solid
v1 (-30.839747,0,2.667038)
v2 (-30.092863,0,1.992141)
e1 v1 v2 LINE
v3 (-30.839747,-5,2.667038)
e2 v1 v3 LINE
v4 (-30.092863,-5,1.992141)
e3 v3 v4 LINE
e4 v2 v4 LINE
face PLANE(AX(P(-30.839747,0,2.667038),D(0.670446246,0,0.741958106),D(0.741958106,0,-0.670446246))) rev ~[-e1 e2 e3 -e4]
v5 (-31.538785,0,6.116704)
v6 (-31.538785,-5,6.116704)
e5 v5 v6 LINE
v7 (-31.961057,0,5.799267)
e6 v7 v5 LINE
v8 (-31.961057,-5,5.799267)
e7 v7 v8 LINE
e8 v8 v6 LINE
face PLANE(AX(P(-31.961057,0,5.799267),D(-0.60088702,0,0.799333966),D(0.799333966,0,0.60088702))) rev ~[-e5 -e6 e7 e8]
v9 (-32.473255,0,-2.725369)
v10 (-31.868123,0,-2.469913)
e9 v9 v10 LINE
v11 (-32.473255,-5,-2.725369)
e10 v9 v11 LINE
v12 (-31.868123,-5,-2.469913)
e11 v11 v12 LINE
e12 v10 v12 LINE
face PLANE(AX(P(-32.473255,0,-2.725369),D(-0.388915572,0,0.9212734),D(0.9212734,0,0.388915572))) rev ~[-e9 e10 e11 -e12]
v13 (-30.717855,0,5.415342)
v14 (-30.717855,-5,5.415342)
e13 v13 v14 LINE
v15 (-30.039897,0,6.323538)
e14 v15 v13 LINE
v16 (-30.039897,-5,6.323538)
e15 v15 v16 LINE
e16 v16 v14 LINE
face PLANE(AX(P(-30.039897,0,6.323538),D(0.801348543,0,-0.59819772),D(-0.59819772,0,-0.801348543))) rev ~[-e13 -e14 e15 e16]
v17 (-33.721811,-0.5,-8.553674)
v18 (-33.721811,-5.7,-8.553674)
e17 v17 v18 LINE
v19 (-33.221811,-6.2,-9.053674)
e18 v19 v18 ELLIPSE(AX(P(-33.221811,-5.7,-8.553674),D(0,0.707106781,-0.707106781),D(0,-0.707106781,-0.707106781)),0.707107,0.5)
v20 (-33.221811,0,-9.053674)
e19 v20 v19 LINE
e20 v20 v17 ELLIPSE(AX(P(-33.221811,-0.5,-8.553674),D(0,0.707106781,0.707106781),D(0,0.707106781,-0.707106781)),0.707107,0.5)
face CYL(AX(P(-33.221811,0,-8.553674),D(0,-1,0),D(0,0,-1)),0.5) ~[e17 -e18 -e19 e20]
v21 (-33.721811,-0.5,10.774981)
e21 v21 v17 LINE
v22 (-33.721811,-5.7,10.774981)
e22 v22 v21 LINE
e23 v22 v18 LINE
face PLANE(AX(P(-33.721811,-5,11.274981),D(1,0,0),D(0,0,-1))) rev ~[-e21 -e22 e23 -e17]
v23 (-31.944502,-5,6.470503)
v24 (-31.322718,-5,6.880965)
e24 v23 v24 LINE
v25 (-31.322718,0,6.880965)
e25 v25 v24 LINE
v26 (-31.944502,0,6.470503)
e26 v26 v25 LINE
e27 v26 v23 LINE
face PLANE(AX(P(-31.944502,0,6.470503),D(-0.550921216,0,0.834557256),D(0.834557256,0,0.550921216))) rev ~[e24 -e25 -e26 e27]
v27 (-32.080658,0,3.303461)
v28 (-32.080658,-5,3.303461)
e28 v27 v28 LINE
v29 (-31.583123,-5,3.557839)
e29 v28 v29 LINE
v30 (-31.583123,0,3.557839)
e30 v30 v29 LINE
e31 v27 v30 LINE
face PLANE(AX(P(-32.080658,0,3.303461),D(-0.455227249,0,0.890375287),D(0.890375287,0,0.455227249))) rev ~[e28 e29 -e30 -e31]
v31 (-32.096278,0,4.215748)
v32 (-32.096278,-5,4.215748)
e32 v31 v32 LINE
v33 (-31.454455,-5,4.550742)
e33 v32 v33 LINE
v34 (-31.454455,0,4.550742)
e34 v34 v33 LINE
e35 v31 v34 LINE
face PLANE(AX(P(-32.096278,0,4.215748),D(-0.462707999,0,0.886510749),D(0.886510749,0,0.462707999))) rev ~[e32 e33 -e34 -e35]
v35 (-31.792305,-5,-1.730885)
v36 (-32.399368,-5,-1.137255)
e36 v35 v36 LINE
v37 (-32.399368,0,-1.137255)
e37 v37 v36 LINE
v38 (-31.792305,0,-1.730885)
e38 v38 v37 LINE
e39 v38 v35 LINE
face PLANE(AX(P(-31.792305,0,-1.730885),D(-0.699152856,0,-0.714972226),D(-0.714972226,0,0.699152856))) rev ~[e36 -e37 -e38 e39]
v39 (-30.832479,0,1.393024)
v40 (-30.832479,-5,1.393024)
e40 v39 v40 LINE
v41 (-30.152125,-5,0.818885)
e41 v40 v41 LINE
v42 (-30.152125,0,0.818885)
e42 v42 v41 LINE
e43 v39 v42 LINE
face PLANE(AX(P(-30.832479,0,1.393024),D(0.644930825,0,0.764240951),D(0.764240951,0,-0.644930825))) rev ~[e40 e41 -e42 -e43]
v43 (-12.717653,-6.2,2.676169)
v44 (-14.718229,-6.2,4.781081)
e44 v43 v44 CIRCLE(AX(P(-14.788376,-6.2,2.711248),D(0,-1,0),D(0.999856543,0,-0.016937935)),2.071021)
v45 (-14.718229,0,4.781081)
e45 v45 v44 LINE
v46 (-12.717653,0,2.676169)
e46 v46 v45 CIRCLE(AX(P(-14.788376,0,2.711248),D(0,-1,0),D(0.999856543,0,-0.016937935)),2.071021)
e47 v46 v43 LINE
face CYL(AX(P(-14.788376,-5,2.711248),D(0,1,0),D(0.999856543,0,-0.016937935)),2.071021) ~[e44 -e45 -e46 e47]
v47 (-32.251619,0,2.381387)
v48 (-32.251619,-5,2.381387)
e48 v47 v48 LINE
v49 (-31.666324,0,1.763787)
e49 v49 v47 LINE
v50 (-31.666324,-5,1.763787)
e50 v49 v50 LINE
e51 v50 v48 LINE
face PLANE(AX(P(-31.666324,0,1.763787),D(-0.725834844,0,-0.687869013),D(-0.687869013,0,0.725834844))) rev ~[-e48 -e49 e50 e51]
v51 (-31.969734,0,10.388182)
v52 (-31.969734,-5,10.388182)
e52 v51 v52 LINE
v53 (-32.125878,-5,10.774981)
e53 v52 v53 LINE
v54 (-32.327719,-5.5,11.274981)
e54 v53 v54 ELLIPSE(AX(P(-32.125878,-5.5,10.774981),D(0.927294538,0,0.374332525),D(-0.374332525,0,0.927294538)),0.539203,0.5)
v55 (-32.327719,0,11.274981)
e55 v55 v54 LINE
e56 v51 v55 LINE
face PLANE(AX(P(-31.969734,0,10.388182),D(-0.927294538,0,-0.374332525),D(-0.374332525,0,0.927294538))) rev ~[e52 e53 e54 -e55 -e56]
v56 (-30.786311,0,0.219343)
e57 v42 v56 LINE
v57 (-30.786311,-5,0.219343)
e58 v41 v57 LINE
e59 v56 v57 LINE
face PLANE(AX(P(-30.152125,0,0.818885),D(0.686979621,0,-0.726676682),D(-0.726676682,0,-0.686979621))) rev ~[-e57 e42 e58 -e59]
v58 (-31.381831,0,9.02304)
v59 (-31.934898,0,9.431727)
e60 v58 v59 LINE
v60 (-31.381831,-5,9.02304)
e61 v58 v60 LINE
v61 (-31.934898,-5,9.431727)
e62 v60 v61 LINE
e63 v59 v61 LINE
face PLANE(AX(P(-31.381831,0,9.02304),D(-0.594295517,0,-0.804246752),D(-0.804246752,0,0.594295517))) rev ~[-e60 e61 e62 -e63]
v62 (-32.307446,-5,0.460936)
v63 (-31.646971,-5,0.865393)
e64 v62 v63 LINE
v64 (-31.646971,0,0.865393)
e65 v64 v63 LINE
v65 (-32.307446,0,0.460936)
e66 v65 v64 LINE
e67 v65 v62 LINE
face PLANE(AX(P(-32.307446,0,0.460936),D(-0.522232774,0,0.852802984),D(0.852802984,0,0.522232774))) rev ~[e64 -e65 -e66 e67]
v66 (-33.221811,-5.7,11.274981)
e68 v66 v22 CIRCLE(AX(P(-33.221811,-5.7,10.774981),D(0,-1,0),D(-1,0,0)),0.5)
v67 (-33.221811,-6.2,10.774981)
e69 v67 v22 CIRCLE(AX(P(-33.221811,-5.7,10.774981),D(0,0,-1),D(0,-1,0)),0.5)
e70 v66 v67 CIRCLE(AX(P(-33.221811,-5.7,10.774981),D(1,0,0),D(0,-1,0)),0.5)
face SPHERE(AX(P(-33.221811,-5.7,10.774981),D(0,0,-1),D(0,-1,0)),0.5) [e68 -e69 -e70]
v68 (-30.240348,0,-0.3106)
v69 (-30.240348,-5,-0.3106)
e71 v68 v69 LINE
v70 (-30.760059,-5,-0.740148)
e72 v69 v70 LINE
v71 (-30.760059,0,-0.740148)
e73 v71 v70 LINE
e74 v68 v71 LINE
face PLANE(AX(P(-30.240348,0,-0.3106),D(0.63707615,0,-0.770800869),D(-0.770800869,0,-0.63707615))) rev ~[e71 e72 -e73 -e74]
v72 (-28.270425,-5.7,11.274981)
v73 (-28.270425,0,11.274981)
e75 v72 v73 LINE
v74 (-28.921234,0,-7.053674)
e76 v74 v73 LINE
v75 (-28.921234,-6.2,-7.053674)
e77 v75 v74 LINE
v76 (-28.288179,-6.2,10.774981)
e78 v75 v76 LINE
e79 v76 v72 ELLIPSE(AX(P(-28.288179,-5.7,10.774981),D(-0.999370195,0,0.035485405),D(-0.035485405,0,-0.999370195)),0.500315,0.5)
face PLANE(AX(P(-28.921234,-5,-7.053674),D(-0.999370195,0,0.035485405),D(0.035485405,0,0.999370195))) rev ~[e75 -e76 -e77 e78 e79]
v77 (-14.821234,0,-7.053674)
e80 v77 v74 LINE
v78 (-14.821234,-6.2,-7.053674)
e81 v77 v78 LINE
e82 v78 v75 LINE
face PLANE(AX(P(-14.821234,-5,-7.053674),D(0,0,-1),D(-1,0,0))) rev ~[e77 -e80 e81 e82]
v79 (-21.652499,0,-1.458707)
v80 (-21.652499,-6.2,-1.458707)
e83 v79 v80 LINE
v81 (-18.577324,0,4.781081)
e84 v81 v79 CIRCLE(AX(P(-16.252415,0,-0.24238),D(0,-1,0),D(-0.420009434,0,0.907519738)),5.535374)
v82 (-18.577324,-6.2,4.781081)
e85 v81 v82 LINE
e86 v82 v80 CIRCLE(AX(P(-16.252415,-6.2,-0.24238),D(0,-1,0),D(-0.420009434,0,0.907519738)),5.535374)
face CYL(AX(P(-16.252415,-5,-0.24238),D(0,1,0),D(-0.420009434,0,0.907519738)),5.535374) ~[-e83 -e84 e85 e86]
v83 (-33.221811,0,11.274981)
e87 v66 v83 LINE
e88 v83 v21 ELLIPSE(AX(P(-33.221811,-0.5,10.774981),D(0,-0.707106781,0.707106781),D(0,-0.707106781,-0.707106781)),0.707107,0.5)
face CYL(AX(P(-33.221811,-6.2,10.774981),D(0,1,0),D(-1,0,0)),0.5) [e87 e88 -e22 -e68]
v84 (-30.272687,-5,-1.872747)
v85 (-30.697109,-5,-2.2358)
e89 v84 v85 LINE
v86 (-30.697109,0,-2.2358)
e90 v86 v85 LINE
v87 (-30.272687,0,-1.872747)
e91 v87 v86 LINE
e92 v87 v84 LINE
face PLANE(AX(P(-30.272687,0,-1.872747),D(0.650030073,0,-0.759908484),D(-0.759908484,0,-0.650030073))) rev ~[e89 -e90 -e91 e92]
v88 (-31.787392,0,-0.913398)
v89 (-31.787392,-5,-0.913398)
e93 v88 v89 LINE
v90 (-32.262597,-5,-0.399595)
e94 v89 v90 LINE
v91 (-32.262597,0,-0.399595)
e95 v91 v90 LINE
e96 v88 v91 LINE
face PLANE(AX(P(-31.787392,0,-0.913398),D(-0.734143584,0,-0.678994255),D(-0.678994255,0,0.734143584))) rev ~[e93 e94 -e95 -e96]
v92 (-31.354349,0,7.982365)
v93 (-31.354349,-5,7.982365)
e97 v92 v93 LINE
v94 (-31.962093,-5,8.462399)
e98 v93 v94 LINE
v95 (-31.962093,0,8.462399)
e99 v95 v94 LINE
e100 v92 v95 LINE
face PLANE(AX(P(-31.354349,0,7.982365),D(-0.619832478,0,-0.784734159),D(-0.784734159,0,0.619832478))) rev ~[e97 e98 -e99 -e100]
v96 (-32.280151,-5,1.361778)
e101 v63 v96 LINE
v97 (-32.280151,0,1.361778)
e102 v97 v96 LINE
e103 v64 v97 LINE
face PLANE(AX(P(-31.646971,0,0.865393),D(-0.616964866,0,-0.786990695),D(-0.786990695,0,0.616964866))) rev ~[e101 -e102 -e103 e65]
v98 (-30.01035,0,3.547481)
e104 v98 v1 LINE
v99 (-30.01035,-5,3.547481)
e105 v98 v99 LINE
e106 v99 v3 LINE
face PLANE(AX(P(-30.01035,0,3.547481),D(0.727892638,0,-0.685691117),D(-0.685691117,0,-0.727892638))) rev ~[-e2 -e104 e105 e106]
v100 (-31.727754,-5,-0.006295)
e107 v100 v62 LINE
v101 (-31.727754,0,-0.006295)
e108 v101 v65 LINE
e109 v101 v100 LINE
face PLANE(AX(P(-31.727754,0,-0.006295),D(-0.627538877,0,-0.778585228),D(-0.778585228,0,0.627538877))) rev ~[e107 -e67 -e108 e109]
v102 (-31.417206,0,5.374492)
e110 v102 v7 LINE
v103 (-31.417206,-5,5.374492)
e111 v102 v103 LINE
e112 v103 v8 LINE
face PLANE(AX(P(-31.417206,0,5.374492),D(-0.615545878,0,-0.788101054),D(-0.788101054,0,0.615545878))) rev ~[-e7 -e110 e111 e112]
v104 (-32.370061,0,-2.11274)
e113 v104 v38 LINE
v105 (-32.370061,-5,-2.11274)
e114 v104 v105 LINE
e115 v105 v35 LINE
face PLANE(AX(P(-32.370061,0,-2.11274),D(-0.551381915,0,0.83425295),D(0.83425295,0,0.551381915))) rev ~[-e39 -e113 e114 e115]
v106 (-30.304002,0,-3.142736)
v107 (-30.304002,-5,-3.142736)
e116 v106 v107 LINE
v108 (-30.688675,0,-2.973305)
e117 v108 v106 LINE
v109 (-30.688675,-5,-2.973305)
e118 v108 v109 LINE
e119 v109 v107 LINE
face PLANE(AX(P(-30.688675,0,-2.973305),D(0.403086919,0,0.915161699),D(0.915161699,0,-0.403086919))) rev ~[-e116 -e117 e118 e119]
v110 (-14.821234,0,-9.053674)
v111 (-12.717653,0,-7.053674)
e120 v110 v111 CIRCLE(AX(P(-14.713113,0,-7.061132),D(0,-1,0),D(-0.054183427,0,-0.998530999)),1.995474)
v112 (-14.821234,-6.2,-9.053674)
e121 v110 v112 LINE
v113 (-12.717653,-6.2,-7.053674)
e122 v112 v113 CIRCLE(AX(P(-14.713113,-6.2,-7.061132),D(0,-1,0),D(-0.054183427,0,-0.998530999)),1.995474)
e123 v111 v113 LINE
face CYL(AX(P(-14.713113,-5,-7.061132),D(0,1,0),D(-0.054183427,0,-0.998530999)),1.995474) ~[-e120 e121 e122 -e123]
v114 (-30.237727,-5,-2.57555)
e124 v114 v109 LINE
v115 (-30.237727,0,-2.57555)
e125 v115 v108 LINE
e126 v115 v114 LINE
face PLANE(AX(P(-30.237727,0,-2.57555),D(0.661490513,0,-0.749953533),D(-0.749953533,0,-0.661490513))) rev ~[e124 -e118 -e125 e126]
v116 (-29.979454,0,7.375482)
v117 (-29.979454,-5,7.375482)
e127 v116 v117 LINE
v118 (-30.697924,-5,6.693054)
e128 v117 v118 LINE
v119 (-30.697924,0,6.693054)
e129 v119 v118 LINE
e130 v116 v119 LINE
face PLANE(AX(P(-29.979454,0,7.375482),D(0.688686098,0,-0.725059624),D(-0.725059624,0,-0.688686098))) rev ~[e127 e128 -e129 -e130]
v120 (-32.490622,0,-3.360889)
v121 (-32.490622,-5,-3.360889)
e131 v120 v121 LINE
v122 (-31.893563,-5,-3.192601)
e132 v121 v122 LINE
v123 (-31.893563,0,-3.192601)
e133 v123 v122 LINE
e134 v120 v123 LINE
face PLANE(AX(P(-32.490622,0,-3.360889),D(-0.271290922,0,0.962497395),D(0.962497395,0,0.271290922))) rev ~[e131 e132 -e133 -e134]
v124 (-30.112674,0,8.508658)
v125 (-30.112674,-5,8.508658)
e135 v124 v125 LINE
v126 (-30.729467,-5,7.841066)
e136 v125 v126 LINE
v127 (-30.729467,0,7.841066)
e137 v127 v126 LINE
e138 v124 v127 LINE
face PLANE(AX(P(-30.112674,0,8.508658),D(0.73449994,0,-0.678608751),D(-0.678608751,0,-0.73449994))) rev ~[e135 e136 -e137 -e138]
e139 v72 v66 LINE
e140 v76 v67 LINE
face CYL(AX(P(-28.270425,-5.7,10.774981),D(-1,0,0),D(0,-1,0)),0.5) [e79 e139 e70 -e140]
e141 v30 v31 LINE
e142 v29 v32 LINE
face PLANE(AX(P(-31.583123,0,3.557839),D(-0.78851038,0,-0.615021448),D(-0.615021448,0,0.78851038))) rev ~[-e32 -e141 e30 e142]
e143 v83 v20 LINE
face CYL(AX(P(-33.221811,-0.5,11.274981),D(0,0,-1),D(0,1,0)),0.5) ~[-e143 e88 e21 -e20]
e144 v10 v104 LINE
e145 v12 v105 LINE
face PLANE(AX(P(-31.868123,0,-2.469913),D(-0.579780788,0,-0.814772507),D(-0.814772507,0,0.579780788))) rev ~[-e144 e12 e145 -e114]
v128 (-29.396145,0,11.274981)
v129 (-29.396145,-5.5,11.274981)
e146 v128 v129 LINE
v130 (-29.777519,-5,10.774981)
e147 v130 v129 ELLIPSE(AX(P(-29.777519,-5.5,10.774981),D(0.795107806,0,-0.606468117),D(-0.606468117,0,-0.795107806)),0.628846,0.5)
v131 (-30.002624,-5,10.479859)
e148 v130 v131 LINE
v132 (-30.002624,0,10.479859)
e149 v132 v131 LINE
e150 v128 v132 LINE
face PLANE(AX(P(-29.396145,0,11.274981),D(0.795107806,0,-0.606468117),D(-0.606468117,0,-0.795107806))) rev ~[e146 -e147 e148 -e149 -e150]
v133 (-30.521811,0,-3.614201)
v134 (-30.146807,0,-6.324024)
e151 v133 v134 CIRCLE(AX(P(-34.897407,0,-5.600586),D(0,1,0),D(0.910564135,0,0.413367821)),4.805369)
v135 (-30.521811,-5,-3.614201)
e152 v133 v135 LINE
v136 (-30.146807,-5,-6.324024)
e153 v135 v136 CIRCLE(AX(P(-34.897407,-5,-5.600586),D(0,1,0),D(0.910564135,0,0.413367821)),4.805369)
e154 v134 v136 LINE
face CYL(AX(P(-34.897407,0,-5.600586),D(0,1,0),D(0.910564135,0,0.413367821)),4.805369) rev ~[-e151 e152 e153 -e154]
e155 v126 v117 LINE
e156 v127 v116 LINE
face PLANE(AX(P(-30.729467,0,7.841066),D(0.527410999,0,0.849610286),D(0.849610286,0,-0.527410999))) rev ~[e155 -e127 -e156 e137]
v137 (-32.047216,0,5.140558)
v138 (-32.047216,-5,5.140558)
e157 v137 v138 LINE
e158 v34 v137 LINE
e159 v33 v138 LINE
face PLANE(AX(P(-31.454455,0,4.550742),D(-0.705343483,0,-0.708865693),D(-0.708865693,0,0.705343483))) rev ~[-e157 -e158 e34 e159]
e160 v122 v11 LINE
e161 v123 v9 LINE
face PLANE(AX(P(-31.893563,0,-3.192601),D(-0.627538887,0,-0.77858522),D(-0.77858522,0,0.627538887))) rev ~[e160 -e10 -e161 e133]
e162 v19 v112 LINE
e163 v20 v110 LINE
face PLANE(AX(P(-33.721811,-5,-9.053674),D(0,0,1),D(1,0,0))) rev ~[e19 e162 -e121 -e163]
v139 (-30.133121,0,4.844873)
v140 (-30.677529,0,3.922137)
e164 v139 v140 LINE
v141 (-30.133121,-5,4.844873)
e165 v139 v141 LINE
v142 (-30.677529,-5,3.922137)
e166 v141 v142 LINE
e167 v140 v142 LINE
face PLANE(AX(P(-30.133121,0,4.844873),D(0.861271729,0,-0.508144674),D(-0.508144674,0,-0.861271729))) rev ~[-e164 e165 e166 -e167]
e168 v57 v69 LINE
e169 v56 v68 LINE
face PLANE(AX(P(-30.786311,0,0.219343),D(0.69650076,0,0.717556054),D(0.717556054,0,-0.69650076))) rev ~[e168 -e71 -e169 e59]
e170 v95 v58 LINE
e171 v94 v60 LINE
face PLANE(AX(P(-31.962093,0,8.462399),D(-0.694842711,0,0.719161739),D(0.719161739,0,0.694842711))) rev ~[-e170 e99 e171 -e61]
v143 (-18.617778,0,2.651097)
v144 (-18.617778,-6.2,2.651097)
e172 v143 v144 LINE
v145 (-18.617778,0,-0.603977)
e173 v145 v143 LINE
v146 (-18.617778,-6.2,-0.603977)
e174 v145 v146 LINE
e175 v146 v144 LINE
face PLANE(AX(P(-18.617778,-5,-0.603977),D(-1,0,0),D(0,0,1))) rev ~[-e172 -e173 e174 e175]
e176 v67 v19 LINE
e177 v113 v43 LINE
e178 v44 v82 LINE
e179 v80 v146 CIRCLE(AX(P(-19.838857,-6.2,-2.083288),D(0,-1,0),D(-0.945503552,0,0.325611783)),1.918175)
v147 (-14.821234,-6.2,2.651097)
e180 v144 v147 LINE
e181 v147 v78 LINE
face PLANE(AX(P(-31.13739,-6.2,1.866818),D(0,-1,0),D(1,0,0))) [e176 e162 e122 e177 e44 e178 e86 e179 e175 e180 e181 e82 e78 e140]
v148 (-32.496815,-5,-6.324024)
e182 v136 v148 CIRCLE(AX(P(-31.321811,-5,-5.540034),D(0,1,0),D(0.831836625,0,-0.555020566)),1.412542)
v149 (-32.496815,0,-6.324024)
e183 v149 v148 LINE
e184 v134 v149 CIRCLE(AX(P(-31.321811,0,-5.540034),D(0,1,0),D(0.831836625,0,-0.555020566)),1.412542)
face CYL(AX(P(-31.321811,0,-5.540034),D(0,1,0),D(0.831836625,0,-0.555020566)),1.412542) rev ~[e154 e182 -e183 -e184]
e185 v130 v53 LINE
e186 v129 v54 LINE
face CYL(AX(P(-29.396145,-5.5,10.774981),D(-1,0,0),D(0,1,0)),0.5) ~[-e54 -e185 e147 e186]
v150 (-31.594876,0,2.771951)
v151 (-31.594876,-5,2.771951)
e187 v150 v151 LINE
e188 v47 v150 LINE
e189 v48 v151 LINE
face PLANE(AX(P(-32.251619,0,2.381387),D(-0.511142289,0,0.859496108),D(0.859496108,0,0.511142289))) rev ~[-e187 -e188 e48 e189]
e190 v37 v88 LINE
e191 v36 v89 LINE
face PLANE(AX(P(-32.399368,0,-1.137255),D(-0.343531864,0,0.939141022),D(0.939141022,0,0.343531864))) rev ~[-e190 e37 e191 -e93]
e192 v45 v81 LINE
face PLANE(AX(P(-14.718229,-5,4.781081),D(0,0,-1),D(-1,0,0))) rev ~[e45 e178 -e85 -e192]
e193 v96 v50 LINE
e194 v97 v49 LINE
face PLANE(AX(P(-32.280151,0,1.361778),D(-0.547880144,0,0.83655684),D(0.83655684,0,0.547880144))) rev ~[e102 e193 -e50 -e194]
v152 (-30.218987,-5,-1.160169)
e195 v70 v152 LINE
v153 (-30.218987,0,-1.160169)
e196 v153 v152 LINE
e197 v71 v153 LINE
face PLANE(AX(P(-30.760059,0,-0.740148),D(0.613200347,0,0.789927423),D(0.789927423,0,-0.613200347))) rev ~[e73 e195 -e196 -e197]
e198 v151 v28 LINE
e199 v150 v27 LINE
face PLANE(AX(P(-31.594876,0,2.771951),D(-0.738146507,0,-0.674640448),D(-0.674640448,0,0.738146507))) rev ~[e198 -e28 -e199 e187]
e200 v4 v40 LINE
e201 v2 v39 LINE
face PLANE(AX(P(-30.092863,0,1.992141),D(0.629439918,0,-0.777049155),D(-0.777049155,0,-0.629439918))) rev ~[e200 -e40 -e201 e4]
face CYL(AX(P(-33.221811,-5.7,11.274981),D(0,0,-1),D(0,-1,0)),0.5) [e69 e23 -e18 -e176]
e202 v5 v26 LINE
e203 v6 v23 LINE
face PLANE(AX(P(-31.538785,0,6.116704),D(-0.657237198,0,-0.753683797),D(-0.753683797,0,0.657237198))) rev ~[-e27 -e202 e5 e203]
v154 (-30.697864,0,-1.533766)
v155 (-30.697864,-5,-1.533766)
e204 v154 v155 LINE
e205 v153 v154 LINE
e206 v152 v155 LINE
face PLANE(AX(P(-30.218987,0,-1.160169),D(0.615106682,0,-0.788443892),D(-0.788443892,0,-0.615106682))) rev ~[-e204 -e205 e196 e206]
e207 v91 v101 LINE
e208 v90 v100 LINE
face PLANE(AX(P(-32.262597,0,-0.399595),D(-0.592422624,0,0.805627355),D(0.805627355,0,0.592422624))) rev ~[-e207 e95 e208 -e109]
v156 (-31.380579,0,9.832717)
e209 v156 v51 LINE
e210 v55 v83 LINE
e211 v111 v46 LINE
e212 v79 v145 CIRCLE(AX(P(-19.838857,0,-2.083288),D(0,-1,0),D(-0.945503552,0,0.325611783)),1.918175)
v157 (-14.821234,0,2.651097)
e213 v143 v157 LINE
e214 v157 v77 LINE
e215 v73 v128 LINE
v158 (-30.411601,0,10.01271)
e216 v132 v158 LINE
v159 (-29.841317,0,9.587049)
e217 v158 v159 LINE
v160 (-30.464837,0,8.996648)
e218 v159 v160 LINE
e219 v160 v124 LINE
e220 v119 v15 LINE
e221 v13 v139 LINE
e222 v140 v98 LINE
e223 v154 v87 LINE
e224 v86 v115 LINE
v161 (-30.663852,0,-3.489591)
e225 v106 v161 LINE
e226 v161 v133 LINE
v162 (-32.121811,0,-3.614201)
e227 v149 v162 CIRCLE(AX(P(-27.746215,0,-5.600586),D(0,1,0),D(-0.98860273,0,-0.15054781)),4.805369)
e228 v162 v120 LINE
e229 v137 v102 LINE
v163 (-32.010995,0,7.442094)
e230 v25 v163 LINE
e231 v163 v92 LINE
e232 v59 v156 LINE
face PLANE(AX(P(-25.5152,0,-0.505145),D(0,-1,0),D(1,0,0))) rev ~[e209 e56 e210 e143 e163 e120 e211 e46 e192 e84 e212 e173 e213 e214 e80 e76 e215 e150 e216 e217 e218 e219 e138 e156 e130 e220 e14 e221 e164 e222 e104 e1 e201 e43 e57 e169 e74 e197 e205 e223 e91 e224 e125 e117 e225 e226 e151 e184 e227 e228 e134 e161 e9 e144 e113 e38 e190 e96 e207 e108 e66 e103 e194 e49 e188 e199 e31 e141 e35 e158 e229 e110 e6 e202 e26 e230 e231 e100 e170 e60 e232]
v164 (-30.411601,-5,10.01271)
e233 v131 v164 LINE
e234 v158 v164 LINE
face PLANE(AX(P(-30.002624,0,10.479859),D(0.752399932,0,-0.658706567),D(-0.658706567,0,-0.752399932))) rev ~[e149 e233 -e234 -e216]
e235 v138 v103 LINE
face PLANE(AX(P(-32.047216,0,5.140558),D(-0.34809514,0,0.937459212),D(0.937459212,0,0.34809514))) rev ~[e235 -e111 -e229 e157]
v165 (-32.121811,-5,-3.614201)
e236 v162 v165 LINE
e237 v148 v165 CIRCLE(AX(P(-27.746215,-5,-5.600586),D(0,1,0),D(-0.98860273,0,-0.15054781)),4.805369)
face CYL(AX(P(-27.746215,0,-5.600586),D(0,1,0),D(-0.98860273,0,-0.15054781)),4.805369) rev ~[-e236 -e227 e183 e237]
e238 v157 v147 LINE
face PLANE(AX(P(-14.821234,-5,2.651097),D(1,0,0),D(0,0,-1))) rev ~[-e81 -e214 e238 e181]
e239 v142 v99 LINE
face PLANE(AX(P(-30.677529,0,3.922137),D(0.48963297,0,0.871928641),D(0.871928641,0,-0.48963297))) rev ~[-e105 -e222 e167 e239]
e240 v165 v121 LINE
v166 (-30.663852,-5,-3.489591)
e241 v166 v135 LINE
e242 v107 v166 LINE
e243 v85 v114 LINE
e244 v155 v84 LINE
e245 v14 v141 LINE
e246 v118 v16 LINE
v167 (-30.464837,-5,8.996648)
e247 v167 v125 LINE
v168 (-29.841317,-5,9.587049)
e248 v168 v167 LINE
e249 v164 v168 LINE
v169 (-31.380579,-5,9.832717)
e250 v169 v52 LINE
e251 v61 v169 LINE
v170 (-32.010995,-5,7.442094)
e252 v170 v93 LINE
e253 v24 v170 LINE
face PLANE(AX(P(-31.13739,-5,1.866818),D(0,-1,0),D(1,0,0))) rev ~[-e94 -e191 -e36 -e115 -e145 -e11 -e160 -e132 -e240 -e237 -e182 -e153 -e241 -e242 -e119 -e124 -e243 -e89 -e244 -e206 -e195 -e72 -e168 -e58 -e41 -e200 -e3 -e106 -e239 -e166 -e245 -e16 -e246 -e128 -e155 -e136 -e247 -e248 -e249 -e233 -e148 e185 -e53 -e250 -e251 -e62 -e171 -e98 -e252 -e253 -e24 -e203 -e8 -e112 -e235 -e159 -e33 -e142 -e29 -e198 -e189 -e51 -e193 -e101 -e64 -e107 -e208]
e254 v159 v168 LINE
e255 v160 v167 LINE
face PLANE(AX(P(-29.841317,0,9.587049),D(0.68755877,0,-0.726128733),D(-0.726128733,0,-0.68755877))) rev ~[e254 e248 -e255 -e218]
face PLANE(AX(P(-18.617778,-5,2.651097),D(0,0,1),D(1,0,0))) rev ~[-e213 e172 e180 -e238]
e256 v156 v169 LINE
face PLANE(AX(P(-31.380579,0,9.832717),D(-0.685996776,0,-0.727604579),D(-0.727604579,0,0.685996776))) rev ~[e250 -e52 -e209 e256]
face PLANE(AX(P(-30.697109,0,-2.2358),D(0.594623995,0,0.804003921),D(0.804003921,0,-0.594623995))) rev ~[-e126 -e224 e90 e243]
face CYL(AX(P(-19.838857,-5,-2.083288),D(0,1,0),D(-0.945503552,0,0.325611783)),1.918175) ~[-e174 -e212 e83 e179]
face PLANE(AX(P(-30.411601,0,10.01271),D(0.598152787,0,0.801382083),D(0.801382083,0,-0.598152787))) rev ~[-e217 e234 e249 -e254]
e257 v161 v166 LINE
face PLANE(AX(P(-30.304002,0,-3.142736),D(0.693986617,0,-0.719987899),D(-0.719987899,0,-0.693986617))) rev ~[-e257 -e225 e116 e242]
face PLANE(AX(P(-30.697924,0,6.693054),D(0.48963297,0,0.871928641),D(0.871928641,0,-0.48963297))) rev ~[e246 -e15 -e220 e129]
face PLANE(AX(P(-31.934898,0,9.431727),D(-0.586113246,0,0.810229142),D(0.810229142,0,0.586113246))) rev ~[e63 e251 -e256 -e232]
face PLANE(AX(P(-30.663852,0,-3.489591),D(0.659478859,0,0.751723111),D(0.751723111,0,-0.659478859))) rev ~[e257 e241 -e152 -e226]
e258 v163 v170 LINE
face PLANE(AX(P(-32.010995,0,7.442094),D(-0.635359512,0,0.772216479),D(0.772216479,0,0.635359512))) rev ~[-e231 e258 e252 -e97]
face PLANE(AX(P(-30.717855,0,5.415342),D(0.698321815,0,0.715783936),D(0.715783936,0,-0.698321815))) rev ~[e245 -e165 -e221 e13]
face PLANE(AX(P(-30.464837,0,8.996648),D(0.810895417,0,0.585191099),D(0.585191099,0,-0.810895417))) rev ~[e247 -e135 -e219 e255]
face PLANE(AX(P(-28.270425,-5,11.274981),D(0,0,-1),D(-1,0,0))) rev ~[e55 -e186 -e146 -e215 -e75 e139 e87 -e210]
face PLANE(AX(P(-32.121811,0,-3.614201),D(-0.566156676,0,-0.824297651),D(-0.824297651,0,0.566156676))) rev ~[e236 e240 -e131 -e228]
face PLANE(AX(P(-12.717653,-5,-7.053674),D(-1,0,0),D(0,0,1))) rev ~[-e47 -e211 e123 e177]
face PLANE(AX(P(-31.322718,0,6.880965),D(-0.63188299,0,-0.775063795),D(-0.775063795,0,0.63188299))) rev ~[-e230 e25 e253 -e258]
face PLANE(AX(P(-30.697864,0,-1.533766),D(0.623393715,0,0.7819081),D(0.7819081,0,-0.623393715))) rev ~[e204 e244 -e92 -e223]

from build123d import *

# Parameters (mm, degrees)
F1_DEPTH = 5
F3_DEPTH = 1.2
F4_R     = 0.5
F5_R     = 0.5


# Not quite as in the source:
# - a feature names something its author has since deleted; it is built from what else it names


with BuildPart() as f1:
    # F0 (on Front) → F1 (new body)
    with BuildSketch(Plane.XZ):
        with BuildLine():
            Line((-14.8212344469, -7.0536743234), (-28.9212344469, -7.0536743234))
            Line((-28.9212344469, -7.0536743234), (-28.2704247986, 11.2749813125))
            Line((-28.2704247986, 11.2749813125), (-28.9218110621, 11.2749813125))
            Line((-28.9218110621, 11.2749813125), (-29.3961446732, 11.2749813125))
            Line((-29.3961446732, 11.2749813125), (-30.0026237965, 10.4798590764))
            Line((-30.0026237965, 10.4798590764), (-30.4116010666, 10.0127095357))
            Line((-30.4116010666, 10.0127095357), (-29.8413168639, 9.5870485529))
            Line((-29.8413168639, 9.5870485529), (-30.4648373276, 8.9966477826))
            Line((-30.4648373276, 8.9966477826), (-30.1126744598, 8.5086580366))
            Line((-30.1126744598, 8.5086580366), (-30.7294670492, 7.841065526))
            Line((-30.7294670492, 7.841065526), (-29.9794543535, 7.3754815385))
            Line((-29.9794543535, 7.3754815385), (-30.6979243471, 6.6930544935))
            Line((-30.6979243471, 6.6930544935), (-30.0398971885, 6.3235382549))
            Line((-30.0398971885, 6.3235382549), (-30.7178553194, 5.4153422825))
            Line((-30.7178553194, 5.4153422825), (-30.1331207156, 4.8448727466))
            Line((-30.1331207156, 4.8448727466), (-30.6775290519, 3.9221365005))
            Line((-30.6775290519, 3.9221365005), (-30.0103500485, 3.5474810284))
            Line((-30.0103500485, 3.5474810284), (-30.8397468179, 2.6670382358))
            Line((-30.8397468179, 2.6670382358), (-30.092863366, 1.9921413623))
            Line((-30.092863366, 1.9921413623), (-30.8324787766, 1.3930242276))
            Line((-30.8324787766, 1.3930242276), (-30.1521252841, 0.8188846987))
            Line((-30.1521252841, 0.8188846987), (-30.7863112539, 0.2193431865))
            Line((-30.7863112539, 0.2193431865), (-30.2403476089, -0.3106002114))
            Line((-30.2403476089, -0.3106002114), (-30.7600591332, -0.7401480107))
            Line((-30.7600591332, -0.7401480107), (-30.2189867944, -1.1601685546))
            Line((-30.2189867944, -1.1601685546), (-30.697863549, -1.5337655786))
            Line((-30.697863549, -1.5337655786), (-30.272686854, -1.8727472052))
            Line((-30.272686854, -1.8727472052), (-30.6971091777, -2.2358004935))
            Line((-30.6971091777, -2.2358004935), (-30.2377268672, -2.5755497627))
            Line((-30.2377268672, -2.5755497627), (-30.6886751205, -2.9733050615))
            Line((-30.6886751205, -2.9733050615), (-30.3040016443, -3.1427361537))
            Line((-30.3040016443, -3.1427361537), (-30.6638516486, -3.4895907156))
            Line((-30.6638516486, -3.4895907156), (-30.5218110621, -3.6142014433))
            ThreePointArc((-30.5218110621, -3.6142014433), (-30.1374019423, -4.9418633416), (-30.1468068426, -6.3240239819))
            ThreePointArc((-30.1468068426, -6.3240239819), (-31.3218110621, -6.9525761479), (-32.4968152816, -6.3240239819))
            ThreePointArc((-32.4968152816, -6.3240239819), (-32.5062201819, -4.9418633416), (-32.1218110621, -3.6142014433))
            Line((-32.1218110621, -3.6142014433), (-32.4906222522, -3.3608889207))
            Line((-32.4906222522, -3.3608889207), (-31.8935625255, -3.1926007941))
            Line((-31.8935625255, -3.1926007941), (-32.4732549489, -2.725369297))
            Line((-32.4732549489, -2.725369297), (-31.8681225181, -2.469912637))
            Line((-31.8681225181, -2.469912637), (-32.3700606823, -2.1127404179))
            Line((-32.3700606823, -2.1127404179), (-31.7923054099, -1.7308852402))
            Line((-31.7923054099, -1.7308852402), (-32.3993675411, -1.1372548761))
            Line((-32.3993675411, -1.1372548761), (-31.787391752, -0.9133979911))
            Line((-31.787391752, -0.9133979911), (-32.2625972331, -0.3995953302))
            Line((-32.2625972331, -0.3995953302), (-31.7277535796, -0.0062950298))
            Line((-31.7277535796, -0.0062950298), (-32.307446003, 0.4609364551))
            Line((-32.307446003, 0.4609364551), (-31.6469706595, 0.8653931436))
            Line((-31.6469706595, 0.8653931436), (-32.2801508009, 1.3617775403))
            Line((-32.2801508009, 1.3617775403), (-31.6663235426, 1.7637870042))
            Line((-31.6663235426, 1.7637870042), (-32.2516188025, 2.381386701))
            Line((-32.2516188025, 2.381386701), (-31.5948762, 2.771951491))
            Line((-31.5948762, 2.771951491), (-32.0806577802, 3.3034612425))
            Line((-32.0806577802, 3.3034612425), (-31.5831229091, 3.5578387324))
            Line((-31.5831229091, 3.5578387324), (-32.0962779224, 4.2157475837))
            Line((-32.0962779224, 4.2157475837), (-31.4544551075, 4.5507424511))
            Line((-31.4544551075, 4.5507424511), (-32.0472158492, 5.1405578852))
            Line((-32.0472158492, 5.1405578852), (-31.4172059298, 5.3744916804))
            Line((-31.4172059298, 5.3744916804), (-31.9610573351, 5.7992665097))
            Line((-31.9610573351, 5.7992665097), (-31.5387845039, 6.1167036183))
            Line((-31.5387845039, 6.1167036183), (-31.9445021451, 6.4705028199))
            Line((-31.9445021451, 6.4705028199), (-31.3227176666, 6.8809650838))
            Line((-31.3227176666, 6.8809650838), (-32.0109948516, 7.44209392))
            Line((-32.0109948516, 7.44209392), (-31.3543491066, 7.9823648557))
            Line((-31.3543491066, 7.9823648557), (-31.9620929658, 8.4623992443))
            Line((-31.9620929658, 8.4623992443), (-31.3818305731, 9.0230396017))
            Line((-31.3818305731, 9.0230396017), (-31.9348983467, 9.4317272305))
            Line((-31.9348983467, 9.4317272305), (-31.3805788755, 9.8327174783))
            Line((-31.3805788755, 9.8327174783), (-31.9697335362, 10.3881815448))
            Line((-31.9697335362, 10.3881815448), (-32.3277190328, 11.2749813125))
            Line((-32.3277190328, 11.2749813125), (-33.7218110621, 11.2749813125))
            Line((-33.7218110621, 11.2749813125), (-33.7218110621, -9.0536743234))
            Line((-33.7218110621, -9.0536743234), (-14.8212344469, -9.0536743234))
            ThreePointArc((-14.8212344469, -9.0536743234), (-13.3381540877, -8.5073007085), (-12.7176528294, -7.0536743234))
            Line((-12.7176528294, -7.0536743234), (-12.7176528294, 2.67616936))
            ThreePointArc((-12.7176528294, 2.67616936), (-13.2872120436, 4.138004008), (-14.7182294446, 4.7810805465))
            Line((-14.7182294446, 4.7810805465), (-18.5773239742, 4.7810805465))
            ThreePointArc((-18.5773239742, 4.7810805465), (-21.2175552856, 2.2046060367), (-21.6524992138, -1.4587074984))
            ThreePointArc((-21.6524992138, -1.4587074984), (-19.3188346891, -3.9296286003), (-18.6177780154, -0.6039766724))
            Line((-18.6177780154, -0.6039766724), (-18.6177780154, 2.6510965993))
            Line((-18.6177780154, 2.6510965993), (-14.8212344469, 2.6510965993))
            Line((-14.8212344469, 2.6510965993), (-14.8212344469, -7.0536743234))
        make_face()
    extrude(amount=F1_DEPTH)

    # F2 (on face) → F3 (join)
    with BuildSketch(Plane.XZ.offset(5)):
        with BuildLine():
            Line((-32.6968152816, 11.2749813125), (-32.6968152816, -7.0536743234))
            Line((-32.6968152816, -7.0536743234), (-29.3961446732, -7.0536743234))
            Line((-29.3961446732, -7.0536743234), (-29.3961446732, 11.2749813125))
            Line((-29.3961446732, 11.2749813125), (-30.0026237965, 10.4798590764))
            Line((-30.0026237965, 10.4798590764), (-30.4116010666, 10.0127095357))
            Line((-30.4116010666, 10.0127095357), (-29.8413168639, 9.5870485529))
            Line((-29.8413168639, 9.5870485529), (-30.4648373276, 8.9966477826))
            Line((-30.4648373276, 8.9966477826), (-30.1126744598, 8.5086580366))
            Line((-30.1126744598, 8.5086580366), (-30.7294670492, 7.841065526))
            Line((-30.7294670492, 7.841065526), (-29.9794543535, 7.3754815385))
            Line((-29.9794543535, 7.3754815385), (-30.6979243471, 6.6930544935))
            Line((-30.6979243471, 6.6930544935), (-30.0398971885, 6.3235382549))
            Line((-30.0398971885, 6.3235382549), (-30.7178553194, 5.4153422825))
            Line((-30.7178553194, 5.4153422825), (-30.1331207156, 4.8448727466))
            Line((-30.1331207156, 4.8448727466), (-30.6775290519, 3.9221365005))
            Line((-30.6775290519, 3.9221365005), (-30.0103500485, 3.5474810284))
            Line((-30.0103500485, 3.5474810284), (-30.8397468179, 2.6670382358))
            Line((-30.8397468179, 2.6670382358), (-30.092863366, 1.9921413623))
            Line((-30.092863366, 1.9921413623), (-30.8324787766, 1.3930242276))
            Line((-30.8324787766, 1.3930242276), (-30.1521252841, 0.8188846987))
            Line((-30.1521252841, 0.8188846987), (-30.7863112539, 0.2193431865))
            Line((-30.7863112539, 0.2193431865), (-30.2403476089, -0.3106002114))
            Line((-30.2403476089, -0.3106002114), (-30.7600591332, -0.7401480107))
            Line((-30.7600591332, -0.7401480107), (-30.2189867944, -1.1601685546))
            Line((-30.2189867944, -1.1601685546), (-30.697863549, -1.5337655786))
            Line((-30.697863549, -1.5337655786), (-30.272686854, -1.8727472052))
            Line((-30.272686854, -1.8727472052), (-30.6971091777, -2.2358004935))
            Line((-30.6971091777, -2.2358004935), (-30.2377268672, -2.5755497627))
            Line((-30.2377268672, -2.5755497627), (-30.6886751205, -2.9733050615))
            Line((-30.6886751205, -2.9733050615), (-30.3040016443, -3.1427361537))
            Line((-30.3040016443, -3.1427361537), (-30.6638516486, -3.4895907156))
            Line((-30.6638516486, -3.4895907156), (-30.5218110621, -3.6142014433))
            ThreePointArc((-30.5218110621, -3.6142014433), (-30.1374019423, -4.9418633416), (-30.1468068426, -6.3240239819))
            ThreePointArc((-30.1468068426, -6.3240239819), (-31.3218110621, -6.9525761479), (-32.4968152816, -6.3240239819))
            ThreePointArc((-32.4968152816, -6.3240239819), (-32.5062201819, -4.9418633416), (-32.1218110621, -3.6142014433))
            Line((-32.1218110621, -3.6142014433), (-32.4906222522, -3.3608889207))
            Line((-32.4906222522, -3.3608889207), (-31.8935625255, -3.1926007941))
            Line((-31.8935625255, -3.1926007941), (-32.4732549489, -2.725369297))
            Line((-32.4732549489, -2.725369297), (-31.8681225181, -2.469912637))
            Line((-31.8681225181, -2.469912637), (-32.3700606823, -2.1127404179))
            Line((-32.3700606823, -2.1127404179), (-31.7923054099, -1.7308852402))
            Line((-31.7923054099, -1.7308852402), (-32.3993675411, -1.1372548761))
            Line((-32.3993675411, -1.1372548761), (-31.787391752, -0.9133979911))
            Line((-31.787391752, -0.9133979911), (-32.2625972331, -0.3995953302))
            Line((-32.2625972331, -0.3995953302), (-31.7277535796, -0.0062950298))
            Line((-31.7277535796, -0.0062950298), (-32.307446003, 0.4609364551))
            Line((-32.307446003, 0.4609364551), (-31.6469706595, 0.8653931436))
            Line((-31.6469706595, 0.8653931436), (-32.2801508009, 1.3617775403))
            Line((-32.2801508009, 1.3617775403), (-31.6663235426, 1.7637870042))
            Line((-31.6663235426, 1.7637870042), (-32.2516188025, 2.381386701))
            Line((-32.2516188025, 2.381386701), (-31.5948762, 2.771951491))
            Line((-31.5948762, 2.771951491), (-32.0806577802, 3.3034612425))
            Line((-32.0806577802, 3.3034612425), (-31.5831229091, 3.5578387324))
            Line((-31.5831229091, 3.5578387324), (-32.0962779224, 4.2157475837))
            Line((-32.0962779224, 4.2157475837), (-31.4544551075, 4.5507424511))
            Line((-31.4544551075, 4.5507424511), (-32.0472158492, 5.1405578852))
            Line((-32.0472158492, 5.1405578852), (-31.4172059298, 5.3744916804))
            Line((-31.4172059298, 5.3744916804), (-31.9610573351, 5.7992665097))
            Line((-31.9610573351, 5.7992665097), (-31.5387845039, 6.1167036183))
            Line((-31.5387845039, 6.1167036183), (-31.9445021451, 6.4705028199))
            Line((-31.9445021451, 6.4705028199), (-31.3227176666, 6.8809650838))
            Line((-31.3227176666, 6.8809650838), (-32.0109948516, 7.44209392))
            Line((-32.0109948516, 7.44209392), (-31.3543491066, 7.9823648557))
            Line((-31.3543491066, 7.9823648557), (-31.9620929658, 8.4623992443))
            Line((-31.9620929658, 8.4623992443), (-31.3818305731, 9.0230396017))
            Line((-31.3818305731, 9.0230396017), (-31.9348983467, 9.4317272305))
            Line((-31.9348983467, 9.4317272305), (-31.3805788755, 9.8327174783))
            Line((-31.3805788755, 9.8327174783), (-31.9697335362, 10.3881815448))
            Line((-31.9697335362, 10.3881815448), (-32.3277190328, 11.2749813125))
            Line((-32.3277190328, 11.2749813125), (-32.6968152816, 11.2749813125))
        make_face()
        with BuildLine():
            Line((-30.0026237965, 10.4798590764), (-29.3961446732, 11.2749813125))
            Line((-29.3961446732, 11.2749813125), (-32.3277190328, 11.2749813125))
            Line((-32.3277190328, 11.2749813125), (-31.9697335362, 10.3881815448))
            Line((-31.9697335362, 10.3881815448), (-31.3805788755, 9.8327174783))
            Line((-31.3805788755, 9.8327174783), (-31.9348983467, 9.4317272305))
            Line((-31.9348983467, 9.4317272305), (-31.3818305731, 9.0230396017))
            Line((-31.3818305731, 9.0230396017), (-31.9620929658, 8.4623992443))
            Line((-31.9620929658, 8.4623992443), (-31.3543491066, 7.9823648557))
            Line((-31.3543491066, 7.9823648557), (-32.0109948516, 7.44209392))
            Line((-32.0109948516, 7.44209392), (-31.3227176666, 6.8809650838))
            Line((-31.3227176666, 6.8809650838), (-31.9445021451, 6.4705028199))
            Line((-31.9445021451, 6.4705028199), (-31.5387845039, 6.1167036183))
            Line((-31.5387845039, 6.1167036183), (-31.9610573351, 5.7992665097))
            Line((-31.9610573351, 5.7992665097), (-31.4172059298, 5.3744916804))
            Line((-31.4172059298, 5.3744916804), (-32.0472158492, 5.1405578852))
            Line((-32.0472158492, 5.1405578852), (-31.4544551075, 4.5507424511))
            Line((-31.4544551075, 4.5507424511), (-32.0962779224, 4.2157475837))
            Line((-32.0962779224, 4.2157475837), (-31.5831229091, 3.5578387324))
            Line((-31.5831229091, 3.5578387324), (-32.0806577802, 3.3034612425))
            Line((-32.0806577802, 3.3034612425), (-31.5948762, 2.771951491))
            Line((-31.5948762, 2.771951491), (-32.2516188025, 2.381386701))
            Line((-32.2516188025, 2.381386701), (-31.6663235426, 1.7637870042))
            Line((-31.6663235426, 1.7637870042), (-32.2801508009, 1.3617775403))
            Line((-32.2801508009, 1.3617775403), (-31.6469706595, 0.8653931436))
            Line((-31.6469706595, 0.8653931436), (-32.307446003, 0.4609364551))
            Line((-32.307446003, 0.4609364551), (-31.7277535796, -0.0062950298))
            Line((-31.7277535796, -0.0062950298), (-32.2625972331, -0.3995953302))
            Line((-32.2625972331, -0.3995953302), (-31.787391752, -0.9133979911))
            Line((-31.787391752, -0.9133979911), (-32.3993675411, -1.1372548761))
            Line((-32.3993675411, -1.1372548761), (-31.7923054099, -1.7308852402))
            Line((-31.7923054099, -1.7308852402), (-32.3700606823, -2.1127404179))
            Line((-32.3700606823, -2.1127404179), (-31.8681225181, -2.469912637))
            Line((-31.8681225181, -2.469912637), (-32.4732549489, -2.725369297))
            Line((-32.4732549489, -2.725369297), (-31.8935625255, -3.1926007941))
            Line((-31.8935625255, -3.1926007941), (-32.4906222522, -3.3608889207))
            Line((-32.4906222522, -3.3608889207), (-32.1218110621, -3.6142014433))
            ThreePointArc((-32.1218110621, -3.6142014433), (-32.5062201819, -4.9418633416), (-32.4968152816, -6.3240239819))
            ThreePointArc((-32.4968152816, -6.3240239819), (-31.3218110621, -6.9525761479), (-30.1468068426, -6.3240239819))
            ThreePointArc((-30.1468068426, -6.3240239819), (-30.1374019423, -4.9418633416), (-30.5218110621, -3.6142014433))
            Line((-30.5218110621, -3.6142014433), (-30.6638516486, -3.4895907156))
            Line((-30.6638516486, -3.4895907156), (-30.3040016443, -3.1427361537))
            Line((-30.3040016443, -3.1427361537), (-30.6886751205, -2.9733050615))
            Line((-30.6886751205, -2.9733050615), (-30.2377268672, -2.5755497627))
            Line((-30.2377268672, -2.5755497627), (-30.6971091777, -2.2358004935))
            Line((-30.6971091777, -2.2358004935), (-30.272686854, -1.8727472052))
            Line((-30.272686854, -1.8727472052), (-30.697863549, -1.5337655786))
            Line((-30.697863549, -1.5337655786), (-30.2189867944, -1.1601685546))
            Line((-30.2189867944, -1.1601685546), (-30.7600591332, -0.7401480107))
            Line((-30.7600591332, -0.7401480107), (-30.2403476089, -0.3106002114))
            Line((-30.2403476089, -0.3106002114), (-30.7863112539, 0.2193431865))
            Line((-30.7863112539, 0.2193431865), (-30.1521252841, 0.8188846987))
            Line((-30.1521252841, 0.8188846987), (-30.8324787766, 1.3930242276))
            Line((-30.8324787766, 1.3930242276), (-30.092863366, 1.9921413623))
            Line((-30.092863366, 1.9921413623), (-30.8397468179, 2.6670382358))
            Line((-30.8397468179, 2.6670382358), (-30.0103500485, 3.5474810284))
            Line((-30.0103500485, 3.5474810284), (-30.6775290519, 3.9221365005))
            Line((-30.6775290519, 3.9221365005), (-30.1331207156, 4.8448727466))
            Line((-30.1331207156, 4.8448727466), (-30.7178553194, 5.4153422825))
            Line((-30.7178553194, 5.4153422825), (-30.0398971885, 6.3235382549))
            Line((-30.0398971885, 6.3235382549), (-30.6979243471, 6.6930544935))
            Line((-30.6979243471, 6.6930544935), (-29.9794543535, 7.3754815385))
            Line((-29.9794543535, 7.3754815385), (-30.7294670492, 7.841065526))
            Line((-30.7294670492, 7.841065526), (-30.1126744598, 8.5086580366))
            Line((-30.1126744598, 8.5086580366), (-30.4648373276, 8.9966477826))
            Line((-30.4648373276, 8.9966477826), (-29.8413168639, 9.5870485529))
            Line((-29.8413168639, 9.5870485529), (-30.4116010666, 10.0127095357))
            Line((-30.4116010666, 10.0127095357), (-30.0026237965, 10.4798590764))
        make_face()
        with BuildLine():
            Line((-29.3961446732, -7.0536743234), (-32.6968152816, -7.0536743234))
            Line((-32.6968152816, -7.0536743234), (-32.6968152816, 11.2749813125))
            Line((-32.6968152816, 11.2749813125), (-33.7218110621, 11.2749813125))
            Line((-33.7218110621, 11.2749813125), (-33.7218110621, -9.0536743234))
            Line((-33.7218110621, -9.0536743234), (-14.8212344469, -9.0536743234))
            ThreePointArc((-14.8212344469, -9.0536743234), (-13.3381540877, -8.5073007085), (-12.7176528294, -7.0536743234))
            Line((-12.7176528294, -7.0536743234), (-12.7176528294, 2.67616936))
            ThreePointArc((-12.7176528294, 2.67616936), (-13.2872120436, 4.138004008), (-14.7182294446, 4.7810805465))
            Line((-14.7182294446, 4.7810805465), (-18.5773239742, 4.7810805465))
            ThreePointArc((-18.5773239742, 4.7810805465), (-21.2175552856, 2.2046060367), (-21.6524992138, -1.4587074984))
            ThreePointArc((-21.6524992138, -1.4587074984), (-19.3188346891, -3.9296286003), (-18.6177780154, -0.6039766724))
            Line((-18.6177780154, -0.6039766724), (-18.6177780154, 2.6510965993))
            Line((-18.6177780154, 2.6510965993), (-14.8212344469, 2.6510965993))
            Line((-14.8212344469, 2.6510965993), (-14.8212344469, -7.0536743234))
            Line((-14.8212344469, -7.0536743234), (-28.9212344469, -7.0536743234))
            Line((-28.9212344469, -7.0536743234), (-28.2704247986, 11.2749813125))
            Line((-28.2704247986, 11.2749813125), (-29.3961446732, 11.2749813125))
            Line((-29.3961446732, 11.2749813125), (-29.3961446732, -7.0536743234))
        make_face()
    extrude(amount=F3_DEPTH)

    # F4
    f4_edges = [f1.edges().sort_by_distance(p)[0] for p in [
        (-30.861932, -5, 11.274981),
    ]]
    fillet(f4_edges, radius=F4_R)

    # F5
    f5_edges = [f1.edges().sort_by_distance(p)[0] for p in [
        (-33.721811, 0, 1.110653),
        (-33.721811, -6.2, 1.110653),
        (-33.721811, -3.1, -9.053674),
        (-30.996118, -6.2, 11.274981),
        (-33.721811, -3.1, 11.274981),
    ]]
    fillet(f5_edges, radius=F5_R)


solid = f1.part
